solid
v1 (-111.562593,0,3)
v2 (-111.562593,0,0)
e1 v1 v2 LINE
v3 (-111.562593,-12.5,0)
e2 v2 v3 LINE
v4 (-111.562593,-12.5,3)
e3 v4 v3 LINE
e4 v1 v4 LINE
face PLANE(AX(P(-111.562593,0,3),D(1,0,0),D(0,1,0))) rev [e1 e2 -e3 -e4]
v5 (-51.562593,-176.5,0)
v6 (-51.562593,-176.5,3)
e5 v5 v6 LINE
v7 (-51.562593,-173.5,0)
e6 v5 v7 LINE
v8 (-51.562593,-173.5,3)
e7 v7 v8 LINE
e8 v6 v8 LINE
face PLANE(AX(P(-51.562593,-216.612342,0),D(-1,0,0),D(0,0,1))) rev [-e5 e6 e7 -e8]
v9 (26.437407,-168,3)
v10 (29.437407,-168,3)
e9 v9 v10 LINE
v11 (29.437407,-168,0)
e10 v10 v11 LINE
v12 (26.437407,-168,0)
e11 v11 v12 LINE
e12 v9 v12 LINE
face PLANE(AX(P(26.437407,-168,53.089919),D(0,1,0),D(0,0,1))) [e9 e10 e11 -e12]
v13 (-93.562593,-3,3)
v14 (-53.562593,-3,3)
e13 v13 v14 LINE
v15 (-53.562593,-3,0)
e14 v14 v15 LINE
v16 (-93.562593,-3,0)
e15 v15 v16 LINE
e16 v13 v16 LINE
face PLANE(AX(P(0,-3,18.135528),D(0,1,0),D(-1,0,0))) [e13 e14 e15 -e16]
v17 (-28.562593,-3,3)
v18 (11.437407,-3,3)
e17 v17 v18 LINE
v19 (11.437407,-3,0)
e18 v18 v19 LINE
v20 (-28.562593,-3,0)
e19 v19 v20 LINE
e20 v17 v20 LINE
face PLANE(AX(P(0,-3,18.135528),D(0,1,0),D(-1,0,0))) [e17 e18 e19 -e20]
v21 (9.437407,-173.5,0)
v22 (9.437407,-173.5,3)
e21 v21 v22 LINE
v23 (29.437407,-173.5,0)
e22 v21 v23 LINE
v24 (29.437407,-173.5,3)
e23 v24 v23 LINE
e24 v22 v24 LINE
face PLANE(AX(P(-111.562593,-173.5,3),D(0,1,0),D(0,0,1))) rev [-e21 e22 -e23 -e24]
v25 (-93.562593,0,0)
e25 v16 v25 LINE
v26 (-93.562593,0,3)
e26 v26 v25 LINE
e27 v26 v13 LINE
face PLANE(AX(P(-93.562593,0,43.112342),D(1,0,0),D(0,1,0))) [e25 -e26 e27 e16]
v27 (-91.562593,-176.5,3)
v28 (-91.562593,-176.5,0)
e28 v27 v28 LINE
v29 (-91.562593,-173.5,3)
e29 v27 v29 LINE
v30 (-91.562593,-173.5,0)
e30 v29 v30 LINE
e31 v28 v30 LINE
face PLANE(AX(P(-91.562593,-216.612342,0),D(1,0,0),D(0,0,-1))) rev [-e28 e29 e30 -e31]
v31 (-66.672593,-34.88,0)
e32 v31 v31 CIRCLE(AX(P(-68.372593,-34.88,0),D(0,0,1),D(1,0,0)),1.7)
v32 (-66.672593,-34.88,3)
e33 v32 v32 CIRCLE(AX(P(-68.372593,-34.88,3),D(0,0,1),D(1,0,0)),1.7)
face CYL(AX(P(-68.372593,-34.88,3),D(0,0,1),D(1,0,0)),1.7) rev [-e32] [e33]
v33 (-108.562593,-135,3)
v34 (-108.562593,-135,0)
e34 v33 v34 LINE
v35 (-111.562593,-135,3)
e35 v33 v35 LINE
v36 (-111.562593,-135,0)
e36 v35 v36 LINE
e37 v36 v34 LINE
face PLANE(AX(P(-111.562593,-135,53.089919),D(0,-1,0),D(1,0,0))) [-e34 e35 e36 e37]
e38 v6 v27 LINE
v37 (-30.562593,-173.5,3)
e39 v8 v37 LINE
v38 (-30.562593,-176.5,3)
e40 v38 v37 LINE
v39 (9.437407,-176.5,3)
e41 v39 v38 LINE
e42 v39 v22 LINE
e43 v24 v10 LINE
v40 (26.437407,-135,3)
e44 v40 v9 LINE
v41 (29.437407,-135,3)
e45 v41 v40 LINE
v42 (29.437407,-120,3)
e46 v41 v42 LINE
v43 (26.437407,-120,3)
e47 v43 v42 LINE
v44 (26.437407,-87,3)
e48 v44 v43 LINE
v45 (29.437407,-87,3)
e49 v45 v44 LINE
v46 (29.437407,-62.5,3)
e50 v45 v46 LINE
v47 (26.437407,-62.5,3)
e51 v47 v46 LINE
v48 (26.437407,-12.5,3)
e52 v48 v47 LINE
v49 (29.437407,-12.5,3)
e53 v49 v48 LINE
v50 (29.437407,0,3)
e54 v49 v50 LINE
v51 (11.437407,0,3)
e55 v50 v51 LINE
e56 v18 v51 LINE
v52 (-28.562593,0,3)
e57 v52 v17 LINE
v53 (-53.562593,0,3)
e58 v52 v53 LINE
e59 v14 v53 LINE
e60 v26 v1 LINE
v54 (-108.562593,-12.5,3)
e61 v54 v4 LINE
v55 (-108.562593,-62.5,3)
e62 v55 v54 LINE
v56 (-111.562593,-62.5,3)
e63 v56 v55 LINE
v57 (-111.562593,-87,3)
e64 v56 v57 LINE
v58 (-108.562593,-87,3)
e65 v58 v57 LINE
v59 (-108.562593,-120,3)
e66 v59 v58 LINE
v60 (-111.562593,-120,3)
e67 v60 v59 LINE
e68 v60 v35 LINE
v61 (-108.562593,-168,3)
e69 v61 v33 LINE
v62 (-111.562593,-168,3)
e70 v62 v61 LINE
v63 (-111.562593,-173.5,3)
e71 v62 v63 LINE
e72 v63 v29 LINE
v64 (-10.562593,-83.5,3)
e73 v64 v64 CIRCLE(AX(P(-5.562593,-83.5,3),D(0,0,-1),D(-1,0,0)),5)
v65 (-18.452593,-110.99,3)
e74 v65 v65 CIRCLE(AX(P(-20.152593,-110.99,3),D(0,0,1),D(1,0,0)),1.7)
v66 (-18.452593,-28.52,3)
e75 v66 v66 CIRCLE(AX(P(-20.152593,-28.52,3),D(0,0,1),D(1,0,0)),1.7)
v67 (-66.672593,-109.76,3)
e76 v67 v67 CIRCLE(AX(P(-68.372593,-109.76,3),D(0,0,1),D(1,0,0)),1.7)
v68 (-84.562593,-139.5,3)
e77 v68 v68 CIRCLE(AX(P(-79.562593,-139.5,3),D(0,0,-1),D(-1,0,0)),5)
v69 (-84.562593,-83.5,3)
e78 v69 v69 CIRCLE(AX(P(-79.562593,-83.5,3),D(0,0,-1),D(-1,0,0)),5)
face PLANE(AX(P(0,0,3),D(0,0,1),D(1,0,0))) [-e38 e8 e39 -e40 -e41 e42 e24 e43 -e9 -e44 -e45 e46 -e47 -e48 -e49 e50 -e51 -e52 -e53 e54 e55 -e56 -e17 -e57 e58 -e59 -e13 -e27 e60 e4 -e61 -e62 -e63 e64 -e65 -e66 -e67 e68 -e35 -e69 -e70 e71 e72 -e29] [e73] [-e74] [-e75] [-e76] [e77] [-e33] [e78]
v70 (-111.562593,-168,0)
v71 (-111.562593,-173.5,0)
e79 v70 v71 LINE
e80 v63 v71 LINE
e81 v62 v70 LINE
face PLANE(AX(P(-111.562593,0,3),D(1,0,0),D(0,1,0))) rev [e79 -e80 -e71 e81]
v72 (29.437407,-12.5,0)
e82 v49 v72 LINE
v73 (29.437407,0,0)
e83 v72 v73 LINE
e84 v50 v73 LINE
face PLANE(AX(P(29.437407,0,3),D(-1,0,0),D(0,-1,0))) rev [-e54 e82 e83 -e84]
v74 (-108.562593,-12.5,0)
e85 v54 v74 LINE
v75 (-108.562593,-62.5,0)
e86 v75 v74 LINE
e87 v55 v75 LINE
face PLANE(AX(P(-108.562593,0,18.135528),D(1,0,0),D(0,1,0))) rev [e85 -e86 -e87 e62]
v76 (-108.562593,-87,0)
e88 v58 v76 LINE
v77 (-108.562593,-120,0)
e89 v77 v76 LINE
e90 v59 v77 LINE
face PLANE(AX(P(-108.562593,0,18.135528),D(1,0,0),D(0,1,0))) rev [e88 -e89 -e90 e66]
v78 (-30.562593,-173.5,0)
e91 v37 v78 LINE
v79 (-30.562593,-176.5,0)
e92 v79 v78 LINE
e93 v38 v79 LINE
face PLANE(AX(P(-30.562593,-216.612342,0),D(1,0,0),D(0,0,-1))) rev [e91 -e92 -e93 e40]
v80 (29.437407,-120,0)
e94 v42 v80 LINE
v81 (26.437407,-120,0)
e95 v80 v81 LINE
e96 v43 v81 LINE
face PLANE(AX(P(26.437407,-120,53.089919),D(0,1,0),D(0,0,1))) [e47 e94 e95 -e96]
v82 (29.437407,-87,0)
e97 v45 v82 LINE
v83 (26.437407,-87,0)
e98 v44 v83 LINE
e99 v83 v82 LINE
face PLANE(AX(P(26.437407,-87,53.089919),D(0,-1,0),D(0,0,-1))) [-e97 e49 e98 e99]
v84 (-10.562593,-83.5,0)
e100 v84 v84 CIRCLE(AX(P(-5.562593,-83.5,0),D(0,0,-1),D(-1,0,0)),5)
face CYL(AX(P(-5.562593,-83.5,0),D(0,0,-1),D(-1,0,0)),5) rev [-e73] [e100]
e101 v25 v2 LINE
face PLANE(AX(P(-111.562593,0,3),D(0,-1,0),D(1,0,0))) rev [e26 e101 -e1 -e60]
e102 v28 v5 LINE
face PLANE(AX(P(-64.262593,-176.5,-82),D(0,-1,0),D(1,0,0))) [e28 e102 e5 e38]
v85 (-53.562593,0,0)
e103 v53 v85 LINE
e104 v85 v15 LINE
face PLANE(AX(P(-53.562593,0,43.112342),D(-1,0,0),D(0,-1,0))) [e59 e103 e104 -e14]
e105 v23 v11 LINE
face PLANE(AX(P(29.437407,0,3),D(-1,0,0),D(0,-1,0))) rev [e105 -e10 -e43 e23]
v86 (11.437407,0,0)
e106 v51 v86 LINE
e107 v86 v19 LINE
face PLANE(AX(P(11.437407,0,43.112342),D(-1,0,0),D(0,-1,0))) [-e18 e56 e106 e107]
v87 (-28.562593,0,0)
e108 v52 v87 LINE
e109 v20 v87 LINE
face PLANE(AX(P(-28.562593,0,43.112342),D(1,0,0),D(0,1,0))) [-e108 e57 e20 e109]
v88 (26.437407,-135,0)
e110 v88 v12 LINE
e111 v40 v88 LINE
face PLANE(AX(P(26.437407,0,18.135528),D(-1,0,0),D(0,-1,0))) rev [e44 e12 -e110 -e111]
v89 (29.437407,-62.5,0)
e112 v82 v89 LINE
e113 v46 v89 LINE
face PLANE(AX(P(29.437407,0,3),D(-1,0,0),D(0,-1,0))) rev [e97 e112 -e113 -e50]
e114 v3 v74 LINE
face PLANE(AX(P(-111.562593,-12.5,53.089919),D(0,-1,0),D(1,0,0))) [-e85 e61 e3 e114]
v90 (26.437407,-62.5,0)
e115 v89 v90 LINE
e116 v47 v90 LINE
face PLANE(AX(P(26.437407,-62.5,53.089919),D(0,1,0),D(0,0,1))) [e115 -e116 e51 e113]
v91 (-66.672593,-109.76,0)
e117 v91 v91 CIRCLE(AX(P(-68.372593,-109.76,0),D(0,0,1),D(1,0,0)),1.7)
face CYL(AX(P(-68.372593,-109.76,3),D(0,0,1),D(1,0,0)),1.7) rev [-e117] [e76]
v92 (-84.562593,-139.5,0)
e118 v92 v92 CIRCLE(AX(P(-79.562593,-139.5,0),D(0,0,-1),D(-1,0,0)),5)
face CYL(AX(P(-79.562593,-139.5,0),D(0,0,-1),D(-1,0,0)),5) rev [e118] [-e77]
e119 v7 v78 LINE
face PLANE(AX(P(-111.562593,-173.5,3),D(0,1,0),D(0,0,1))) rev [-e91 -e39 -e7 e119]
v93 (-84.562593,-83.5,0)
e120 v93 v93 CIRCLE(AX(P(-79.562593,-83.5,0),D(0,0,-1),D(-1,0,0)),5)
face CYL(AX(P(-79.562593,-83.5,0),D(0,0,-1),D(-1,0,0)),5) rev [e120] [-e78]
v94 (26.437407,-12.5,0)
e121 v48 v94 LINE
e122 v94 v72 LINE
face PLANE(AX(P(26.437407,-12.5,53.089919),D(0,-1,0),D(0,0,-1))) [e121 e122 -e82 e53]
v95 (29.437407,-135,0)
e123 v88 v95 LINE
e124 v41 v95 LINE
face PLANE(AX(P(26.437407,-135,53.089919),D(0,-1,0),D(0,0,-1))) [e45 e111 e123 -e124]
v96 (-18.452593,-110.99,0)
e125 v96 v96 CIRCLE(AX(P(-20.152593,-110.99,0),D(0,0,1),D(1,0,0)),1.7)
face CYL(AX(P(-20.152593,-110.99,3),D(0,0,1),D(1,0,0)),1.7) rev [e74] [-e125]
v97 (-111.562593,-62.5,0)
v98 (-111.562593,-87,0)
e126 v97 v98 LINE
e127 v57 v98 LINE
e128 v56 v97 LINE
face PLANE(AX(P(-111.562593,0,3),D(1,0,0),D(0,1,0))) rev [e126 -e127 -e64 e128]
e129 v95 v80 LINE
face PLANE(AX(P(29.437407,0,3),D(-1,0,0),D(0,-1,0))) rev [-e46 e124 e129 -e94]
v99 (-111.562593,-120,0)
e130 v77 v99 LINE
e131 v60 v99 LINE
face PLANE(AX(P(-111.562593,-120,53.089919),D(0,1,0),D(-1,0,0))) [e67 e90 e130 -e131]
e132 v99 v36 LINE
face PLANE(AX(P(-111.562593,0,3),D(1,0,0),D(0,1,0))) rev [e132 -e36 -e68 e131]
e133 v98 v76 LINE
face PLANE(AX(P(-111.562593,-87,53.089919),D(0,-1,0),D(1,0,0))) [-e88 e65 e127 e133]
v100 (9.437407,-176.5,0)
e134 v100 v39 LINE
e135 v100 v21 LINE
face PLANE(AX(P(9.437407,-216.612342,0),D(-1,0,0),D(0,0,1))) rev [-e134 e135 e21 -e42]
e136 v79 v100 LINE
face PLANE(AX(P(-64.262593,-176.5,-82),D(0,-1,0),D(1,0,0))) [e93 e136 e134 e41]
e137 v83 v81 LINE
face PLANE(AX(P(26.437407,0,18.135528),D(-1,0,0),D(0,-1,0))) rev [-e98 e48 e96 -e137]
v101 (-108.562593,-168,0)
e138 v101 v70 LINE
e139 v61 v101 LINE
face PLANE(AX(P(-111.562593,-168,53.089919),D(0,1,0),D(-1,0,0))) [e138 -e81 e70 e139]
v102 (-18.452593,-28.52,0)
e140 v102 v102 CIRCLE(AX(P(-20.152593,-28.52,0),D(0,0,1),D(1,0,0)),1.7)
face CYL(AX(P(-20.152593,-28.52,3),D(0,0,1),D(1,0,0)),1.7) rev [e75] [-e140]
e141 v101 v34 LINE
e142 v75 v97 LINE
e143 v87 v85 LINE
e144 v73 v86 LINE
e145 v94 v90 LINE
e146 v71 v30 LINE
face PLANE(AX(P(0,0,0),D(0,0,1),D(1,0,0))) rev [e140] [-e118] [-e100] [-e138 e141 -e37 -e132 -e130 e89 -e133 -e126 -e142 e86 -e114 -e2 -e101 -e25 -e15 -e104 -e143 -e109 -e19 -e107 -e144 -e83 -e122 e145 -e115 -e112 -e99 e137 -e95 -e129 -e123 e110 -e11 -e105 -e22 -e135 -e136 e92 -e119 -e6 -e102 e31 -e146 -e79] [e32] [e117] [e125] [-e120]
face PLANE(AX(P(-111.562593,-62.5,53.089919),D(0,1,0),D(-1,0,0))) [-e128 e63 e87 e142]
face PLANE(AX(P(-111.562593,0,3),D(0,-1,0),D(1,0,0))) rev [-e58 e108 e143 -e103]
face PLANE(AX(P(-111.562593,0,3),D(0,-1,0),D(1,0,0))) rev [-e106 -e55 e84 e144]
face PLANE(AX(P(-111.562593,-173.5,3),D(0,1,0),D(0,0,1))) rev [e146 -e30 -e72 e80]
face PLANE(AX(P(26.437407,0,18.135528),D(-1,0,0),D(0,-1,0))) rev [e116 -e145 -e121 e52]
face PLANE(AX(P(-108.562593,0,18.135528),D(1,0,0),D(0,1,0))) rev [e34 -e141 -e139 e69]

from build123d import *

# Parameters (mm, degrees)
ESQUISSE1_W                     = 141
ESQUISSE1_H                     = 173.5
BOSS_EXTRU_1_DEPTH              = 3
EMPREINTE1_START                = -93.562592566
EMPREINTE1_OUTLINE_W            = 3
EMPREINTE1_OUTLINE_H            = 3
EMPREINTE1_DEPTH                = 40
EMPREINTE1_START_2              = -28.562592566
EMPREINTE1_2_OUTLINE_W          = 3
EMPREINTE1_2_OUTLINE_H          = 3
EMPREINTE1_2_DEPTH              = 40
ESQUISSE2_W                     = 40
ESQUISSE2_H                     = 3
BOSS_EXTRU_2_DEPTH              = 3
EMPREINTE2_START                = -62.5
EMPREINTE2_OUTLINE_W            = 3
EMPREINTE2_OUTLINE_H            = 3
EMPREINTE2_DEPTH                = 50
EMPREINTE2_START_2              = -168
EMPREINTE2_2_OUTLINE_W          = 3
EMPREINTE2_2_OUTLINE_H          = 3
EMPREINTE2_2_DEPTH              = 33
EMPREINTE2_START_3              = -120
EMPREINTE2_3_OUTLINE_W          = 3
EMPREINTE2_3_OUTLINE_H          = 3
EMPREINTE2_3_DEPTH              = 33
D_GAGEMENT_M31_D                = 3.4
DIAM_TRE_DU_PER_AGE_10_0_10_1_D = 10


# Read off the part's stored shape, not the designer's step: Empreinte1, Empreinte2
with BuildPart() as part:
    # Esquisse1 → Boss.-Extru.1 (new body)
    with BuildSketch(Plane.XY):
        with Locations((-41.062592566, -86.75)):
            Rectangle(ESQUISSE1_W, ESQUISSE1_H)
    extrude(amount=BOSS_EXTRU_1_DEPTH)

    # Empreinte1 outline → Empreinte1 (cut)
    with BuildSketch(Plane.YZ.offset(EMPREINTE1_START)):
        with Locations((-1.5, 1.5)):
            Rectangle(EMPREINTE1_OUTLINE_W, EMPREINTE1_OUTLINE_H)
    extrude(amount=EMPREINTE1_DEPTH, mode=Mode.SUBTRACT)

    # Empreinte1 2 outline → Empreinte1 2 (cut)
    with BuildSketch(Plane.YZ.offset(EMPREINTE1_START_2)):
        with Locations((-1.5, 1.5)):
            Rectangle(EMPREINTE1_2_OUTLINE_W, EMPREINTE1_2_OUTLINE_H)
    extrude(amount=EMPREINTE1_2_DEPTH, mode=Mode.SUBTRACT)

    # Esquisse2 → Boss.-Extru.2 (add)
    with BuildSketch(Plane.XZ.offset(173.5)):
        with Locations((-10.562592566, 1.5)):
            Rectangle(ESQUISSE2_W, ESQUISSE2_H)
        with Locations((-71.562592566, 1.5)):
            Rectangle(ESQUISSE2_W, ESQUISSE2_H)
    extrude(amount=BOSS_EXTRU_2_DEPTH)

    # Empreinte2 outline → Empreinte2 (cut)
    with BuildSketch(Plane(origin=(0, 0, 0), x_dir=(1, 0, 0), z_dir=(0, 1, 0)).offset(EMPREINTE2_START)):
        with Locations((27.937407434, -1.5)):
            Rectangle(EMPREINTE2_OUTLINE_W, EMPREINTE2_OUTLINE_H)
        with Locations((-110.062592566, -1.5)):
            Rectangle(EMPREINTE2_OUTLINE_W, EMPREINTE2_OUTLINE_H)
    extrude(amount=EMPREINTE2_DEPTH, mode=Mode.SUBTRACT)

    # Empreinte2 2 outline → Empreinte2 2 (cut)
    with BuildSketch(Plane(origin=(0, 0, 0), x_dir=(1, 0, 0), z_dir=(0, 1, 0)).offset(EMPREINTE2_START_2)):
        with Locations((27.937407434, -1.5)):
            Rectangle(EMPREINTE2_2_OUTLINE_W, EMPREINTE2_2_OUTLINE_H)
        with Locations((-110.062592566, -1.5)):
            Rectangle(EMPREINTE2_2_OUTLINE_W, EMPREINTE2_2_OUTLINE_H)
    extrude(amount=EMPREINTE2_2_DEPTH, mode=Mode.SUBTRACT)

    # Empreinte2 3 outline → Empreinte2 3 (cut)
    with BuildSketch(Plane(origin=(0, 0, 0), x_dir=(1, 0, 0), z_dir=(0, 1, 0)).offset(EMPREINTE2_START_3)):
        with Locations((27.937407434, -1.5)):
            Rectangle(EMPREINTE2_3_OUTLINE_W, EMPREINTE2_3_OUTLINE_H)
        with Locations((-110.062592566, -1.5)):
            Rectangle(EMPREINTE2_3_OUTLINE_W, EMPREINTE2_3_OUTLINE_H)
    extrude(amount=EMPREINTE2_3_DEPTH, mode=Mode.SUBTRACT)

    # Dégagement M31 (through all)
    with Locations(Plane.XY.offset(3)):
        with Locations((-68.372592566, -34.88), (-20.152592566, -28.52), (-68.372592566, -109.76), (-20.152592566, -110.99)):
            Hole(D_GAGEMENT_M31_D / 2)

    # Diamètre du perçage Ø10.0 (10)1 (through all)
    with Locations(Plane(origin=(0, 0, 0), x_dir=(-1, 0, 0), z_dir=(0, 0, -1))):
        with Locations((79.562592566, -139.5), (79.562592566, -83.5), (5.562592566, -83.5)):
            Hole(DIAM_TRE_DU_PER_AGE_10_0_10_1_D / 2)


solid = part.part
